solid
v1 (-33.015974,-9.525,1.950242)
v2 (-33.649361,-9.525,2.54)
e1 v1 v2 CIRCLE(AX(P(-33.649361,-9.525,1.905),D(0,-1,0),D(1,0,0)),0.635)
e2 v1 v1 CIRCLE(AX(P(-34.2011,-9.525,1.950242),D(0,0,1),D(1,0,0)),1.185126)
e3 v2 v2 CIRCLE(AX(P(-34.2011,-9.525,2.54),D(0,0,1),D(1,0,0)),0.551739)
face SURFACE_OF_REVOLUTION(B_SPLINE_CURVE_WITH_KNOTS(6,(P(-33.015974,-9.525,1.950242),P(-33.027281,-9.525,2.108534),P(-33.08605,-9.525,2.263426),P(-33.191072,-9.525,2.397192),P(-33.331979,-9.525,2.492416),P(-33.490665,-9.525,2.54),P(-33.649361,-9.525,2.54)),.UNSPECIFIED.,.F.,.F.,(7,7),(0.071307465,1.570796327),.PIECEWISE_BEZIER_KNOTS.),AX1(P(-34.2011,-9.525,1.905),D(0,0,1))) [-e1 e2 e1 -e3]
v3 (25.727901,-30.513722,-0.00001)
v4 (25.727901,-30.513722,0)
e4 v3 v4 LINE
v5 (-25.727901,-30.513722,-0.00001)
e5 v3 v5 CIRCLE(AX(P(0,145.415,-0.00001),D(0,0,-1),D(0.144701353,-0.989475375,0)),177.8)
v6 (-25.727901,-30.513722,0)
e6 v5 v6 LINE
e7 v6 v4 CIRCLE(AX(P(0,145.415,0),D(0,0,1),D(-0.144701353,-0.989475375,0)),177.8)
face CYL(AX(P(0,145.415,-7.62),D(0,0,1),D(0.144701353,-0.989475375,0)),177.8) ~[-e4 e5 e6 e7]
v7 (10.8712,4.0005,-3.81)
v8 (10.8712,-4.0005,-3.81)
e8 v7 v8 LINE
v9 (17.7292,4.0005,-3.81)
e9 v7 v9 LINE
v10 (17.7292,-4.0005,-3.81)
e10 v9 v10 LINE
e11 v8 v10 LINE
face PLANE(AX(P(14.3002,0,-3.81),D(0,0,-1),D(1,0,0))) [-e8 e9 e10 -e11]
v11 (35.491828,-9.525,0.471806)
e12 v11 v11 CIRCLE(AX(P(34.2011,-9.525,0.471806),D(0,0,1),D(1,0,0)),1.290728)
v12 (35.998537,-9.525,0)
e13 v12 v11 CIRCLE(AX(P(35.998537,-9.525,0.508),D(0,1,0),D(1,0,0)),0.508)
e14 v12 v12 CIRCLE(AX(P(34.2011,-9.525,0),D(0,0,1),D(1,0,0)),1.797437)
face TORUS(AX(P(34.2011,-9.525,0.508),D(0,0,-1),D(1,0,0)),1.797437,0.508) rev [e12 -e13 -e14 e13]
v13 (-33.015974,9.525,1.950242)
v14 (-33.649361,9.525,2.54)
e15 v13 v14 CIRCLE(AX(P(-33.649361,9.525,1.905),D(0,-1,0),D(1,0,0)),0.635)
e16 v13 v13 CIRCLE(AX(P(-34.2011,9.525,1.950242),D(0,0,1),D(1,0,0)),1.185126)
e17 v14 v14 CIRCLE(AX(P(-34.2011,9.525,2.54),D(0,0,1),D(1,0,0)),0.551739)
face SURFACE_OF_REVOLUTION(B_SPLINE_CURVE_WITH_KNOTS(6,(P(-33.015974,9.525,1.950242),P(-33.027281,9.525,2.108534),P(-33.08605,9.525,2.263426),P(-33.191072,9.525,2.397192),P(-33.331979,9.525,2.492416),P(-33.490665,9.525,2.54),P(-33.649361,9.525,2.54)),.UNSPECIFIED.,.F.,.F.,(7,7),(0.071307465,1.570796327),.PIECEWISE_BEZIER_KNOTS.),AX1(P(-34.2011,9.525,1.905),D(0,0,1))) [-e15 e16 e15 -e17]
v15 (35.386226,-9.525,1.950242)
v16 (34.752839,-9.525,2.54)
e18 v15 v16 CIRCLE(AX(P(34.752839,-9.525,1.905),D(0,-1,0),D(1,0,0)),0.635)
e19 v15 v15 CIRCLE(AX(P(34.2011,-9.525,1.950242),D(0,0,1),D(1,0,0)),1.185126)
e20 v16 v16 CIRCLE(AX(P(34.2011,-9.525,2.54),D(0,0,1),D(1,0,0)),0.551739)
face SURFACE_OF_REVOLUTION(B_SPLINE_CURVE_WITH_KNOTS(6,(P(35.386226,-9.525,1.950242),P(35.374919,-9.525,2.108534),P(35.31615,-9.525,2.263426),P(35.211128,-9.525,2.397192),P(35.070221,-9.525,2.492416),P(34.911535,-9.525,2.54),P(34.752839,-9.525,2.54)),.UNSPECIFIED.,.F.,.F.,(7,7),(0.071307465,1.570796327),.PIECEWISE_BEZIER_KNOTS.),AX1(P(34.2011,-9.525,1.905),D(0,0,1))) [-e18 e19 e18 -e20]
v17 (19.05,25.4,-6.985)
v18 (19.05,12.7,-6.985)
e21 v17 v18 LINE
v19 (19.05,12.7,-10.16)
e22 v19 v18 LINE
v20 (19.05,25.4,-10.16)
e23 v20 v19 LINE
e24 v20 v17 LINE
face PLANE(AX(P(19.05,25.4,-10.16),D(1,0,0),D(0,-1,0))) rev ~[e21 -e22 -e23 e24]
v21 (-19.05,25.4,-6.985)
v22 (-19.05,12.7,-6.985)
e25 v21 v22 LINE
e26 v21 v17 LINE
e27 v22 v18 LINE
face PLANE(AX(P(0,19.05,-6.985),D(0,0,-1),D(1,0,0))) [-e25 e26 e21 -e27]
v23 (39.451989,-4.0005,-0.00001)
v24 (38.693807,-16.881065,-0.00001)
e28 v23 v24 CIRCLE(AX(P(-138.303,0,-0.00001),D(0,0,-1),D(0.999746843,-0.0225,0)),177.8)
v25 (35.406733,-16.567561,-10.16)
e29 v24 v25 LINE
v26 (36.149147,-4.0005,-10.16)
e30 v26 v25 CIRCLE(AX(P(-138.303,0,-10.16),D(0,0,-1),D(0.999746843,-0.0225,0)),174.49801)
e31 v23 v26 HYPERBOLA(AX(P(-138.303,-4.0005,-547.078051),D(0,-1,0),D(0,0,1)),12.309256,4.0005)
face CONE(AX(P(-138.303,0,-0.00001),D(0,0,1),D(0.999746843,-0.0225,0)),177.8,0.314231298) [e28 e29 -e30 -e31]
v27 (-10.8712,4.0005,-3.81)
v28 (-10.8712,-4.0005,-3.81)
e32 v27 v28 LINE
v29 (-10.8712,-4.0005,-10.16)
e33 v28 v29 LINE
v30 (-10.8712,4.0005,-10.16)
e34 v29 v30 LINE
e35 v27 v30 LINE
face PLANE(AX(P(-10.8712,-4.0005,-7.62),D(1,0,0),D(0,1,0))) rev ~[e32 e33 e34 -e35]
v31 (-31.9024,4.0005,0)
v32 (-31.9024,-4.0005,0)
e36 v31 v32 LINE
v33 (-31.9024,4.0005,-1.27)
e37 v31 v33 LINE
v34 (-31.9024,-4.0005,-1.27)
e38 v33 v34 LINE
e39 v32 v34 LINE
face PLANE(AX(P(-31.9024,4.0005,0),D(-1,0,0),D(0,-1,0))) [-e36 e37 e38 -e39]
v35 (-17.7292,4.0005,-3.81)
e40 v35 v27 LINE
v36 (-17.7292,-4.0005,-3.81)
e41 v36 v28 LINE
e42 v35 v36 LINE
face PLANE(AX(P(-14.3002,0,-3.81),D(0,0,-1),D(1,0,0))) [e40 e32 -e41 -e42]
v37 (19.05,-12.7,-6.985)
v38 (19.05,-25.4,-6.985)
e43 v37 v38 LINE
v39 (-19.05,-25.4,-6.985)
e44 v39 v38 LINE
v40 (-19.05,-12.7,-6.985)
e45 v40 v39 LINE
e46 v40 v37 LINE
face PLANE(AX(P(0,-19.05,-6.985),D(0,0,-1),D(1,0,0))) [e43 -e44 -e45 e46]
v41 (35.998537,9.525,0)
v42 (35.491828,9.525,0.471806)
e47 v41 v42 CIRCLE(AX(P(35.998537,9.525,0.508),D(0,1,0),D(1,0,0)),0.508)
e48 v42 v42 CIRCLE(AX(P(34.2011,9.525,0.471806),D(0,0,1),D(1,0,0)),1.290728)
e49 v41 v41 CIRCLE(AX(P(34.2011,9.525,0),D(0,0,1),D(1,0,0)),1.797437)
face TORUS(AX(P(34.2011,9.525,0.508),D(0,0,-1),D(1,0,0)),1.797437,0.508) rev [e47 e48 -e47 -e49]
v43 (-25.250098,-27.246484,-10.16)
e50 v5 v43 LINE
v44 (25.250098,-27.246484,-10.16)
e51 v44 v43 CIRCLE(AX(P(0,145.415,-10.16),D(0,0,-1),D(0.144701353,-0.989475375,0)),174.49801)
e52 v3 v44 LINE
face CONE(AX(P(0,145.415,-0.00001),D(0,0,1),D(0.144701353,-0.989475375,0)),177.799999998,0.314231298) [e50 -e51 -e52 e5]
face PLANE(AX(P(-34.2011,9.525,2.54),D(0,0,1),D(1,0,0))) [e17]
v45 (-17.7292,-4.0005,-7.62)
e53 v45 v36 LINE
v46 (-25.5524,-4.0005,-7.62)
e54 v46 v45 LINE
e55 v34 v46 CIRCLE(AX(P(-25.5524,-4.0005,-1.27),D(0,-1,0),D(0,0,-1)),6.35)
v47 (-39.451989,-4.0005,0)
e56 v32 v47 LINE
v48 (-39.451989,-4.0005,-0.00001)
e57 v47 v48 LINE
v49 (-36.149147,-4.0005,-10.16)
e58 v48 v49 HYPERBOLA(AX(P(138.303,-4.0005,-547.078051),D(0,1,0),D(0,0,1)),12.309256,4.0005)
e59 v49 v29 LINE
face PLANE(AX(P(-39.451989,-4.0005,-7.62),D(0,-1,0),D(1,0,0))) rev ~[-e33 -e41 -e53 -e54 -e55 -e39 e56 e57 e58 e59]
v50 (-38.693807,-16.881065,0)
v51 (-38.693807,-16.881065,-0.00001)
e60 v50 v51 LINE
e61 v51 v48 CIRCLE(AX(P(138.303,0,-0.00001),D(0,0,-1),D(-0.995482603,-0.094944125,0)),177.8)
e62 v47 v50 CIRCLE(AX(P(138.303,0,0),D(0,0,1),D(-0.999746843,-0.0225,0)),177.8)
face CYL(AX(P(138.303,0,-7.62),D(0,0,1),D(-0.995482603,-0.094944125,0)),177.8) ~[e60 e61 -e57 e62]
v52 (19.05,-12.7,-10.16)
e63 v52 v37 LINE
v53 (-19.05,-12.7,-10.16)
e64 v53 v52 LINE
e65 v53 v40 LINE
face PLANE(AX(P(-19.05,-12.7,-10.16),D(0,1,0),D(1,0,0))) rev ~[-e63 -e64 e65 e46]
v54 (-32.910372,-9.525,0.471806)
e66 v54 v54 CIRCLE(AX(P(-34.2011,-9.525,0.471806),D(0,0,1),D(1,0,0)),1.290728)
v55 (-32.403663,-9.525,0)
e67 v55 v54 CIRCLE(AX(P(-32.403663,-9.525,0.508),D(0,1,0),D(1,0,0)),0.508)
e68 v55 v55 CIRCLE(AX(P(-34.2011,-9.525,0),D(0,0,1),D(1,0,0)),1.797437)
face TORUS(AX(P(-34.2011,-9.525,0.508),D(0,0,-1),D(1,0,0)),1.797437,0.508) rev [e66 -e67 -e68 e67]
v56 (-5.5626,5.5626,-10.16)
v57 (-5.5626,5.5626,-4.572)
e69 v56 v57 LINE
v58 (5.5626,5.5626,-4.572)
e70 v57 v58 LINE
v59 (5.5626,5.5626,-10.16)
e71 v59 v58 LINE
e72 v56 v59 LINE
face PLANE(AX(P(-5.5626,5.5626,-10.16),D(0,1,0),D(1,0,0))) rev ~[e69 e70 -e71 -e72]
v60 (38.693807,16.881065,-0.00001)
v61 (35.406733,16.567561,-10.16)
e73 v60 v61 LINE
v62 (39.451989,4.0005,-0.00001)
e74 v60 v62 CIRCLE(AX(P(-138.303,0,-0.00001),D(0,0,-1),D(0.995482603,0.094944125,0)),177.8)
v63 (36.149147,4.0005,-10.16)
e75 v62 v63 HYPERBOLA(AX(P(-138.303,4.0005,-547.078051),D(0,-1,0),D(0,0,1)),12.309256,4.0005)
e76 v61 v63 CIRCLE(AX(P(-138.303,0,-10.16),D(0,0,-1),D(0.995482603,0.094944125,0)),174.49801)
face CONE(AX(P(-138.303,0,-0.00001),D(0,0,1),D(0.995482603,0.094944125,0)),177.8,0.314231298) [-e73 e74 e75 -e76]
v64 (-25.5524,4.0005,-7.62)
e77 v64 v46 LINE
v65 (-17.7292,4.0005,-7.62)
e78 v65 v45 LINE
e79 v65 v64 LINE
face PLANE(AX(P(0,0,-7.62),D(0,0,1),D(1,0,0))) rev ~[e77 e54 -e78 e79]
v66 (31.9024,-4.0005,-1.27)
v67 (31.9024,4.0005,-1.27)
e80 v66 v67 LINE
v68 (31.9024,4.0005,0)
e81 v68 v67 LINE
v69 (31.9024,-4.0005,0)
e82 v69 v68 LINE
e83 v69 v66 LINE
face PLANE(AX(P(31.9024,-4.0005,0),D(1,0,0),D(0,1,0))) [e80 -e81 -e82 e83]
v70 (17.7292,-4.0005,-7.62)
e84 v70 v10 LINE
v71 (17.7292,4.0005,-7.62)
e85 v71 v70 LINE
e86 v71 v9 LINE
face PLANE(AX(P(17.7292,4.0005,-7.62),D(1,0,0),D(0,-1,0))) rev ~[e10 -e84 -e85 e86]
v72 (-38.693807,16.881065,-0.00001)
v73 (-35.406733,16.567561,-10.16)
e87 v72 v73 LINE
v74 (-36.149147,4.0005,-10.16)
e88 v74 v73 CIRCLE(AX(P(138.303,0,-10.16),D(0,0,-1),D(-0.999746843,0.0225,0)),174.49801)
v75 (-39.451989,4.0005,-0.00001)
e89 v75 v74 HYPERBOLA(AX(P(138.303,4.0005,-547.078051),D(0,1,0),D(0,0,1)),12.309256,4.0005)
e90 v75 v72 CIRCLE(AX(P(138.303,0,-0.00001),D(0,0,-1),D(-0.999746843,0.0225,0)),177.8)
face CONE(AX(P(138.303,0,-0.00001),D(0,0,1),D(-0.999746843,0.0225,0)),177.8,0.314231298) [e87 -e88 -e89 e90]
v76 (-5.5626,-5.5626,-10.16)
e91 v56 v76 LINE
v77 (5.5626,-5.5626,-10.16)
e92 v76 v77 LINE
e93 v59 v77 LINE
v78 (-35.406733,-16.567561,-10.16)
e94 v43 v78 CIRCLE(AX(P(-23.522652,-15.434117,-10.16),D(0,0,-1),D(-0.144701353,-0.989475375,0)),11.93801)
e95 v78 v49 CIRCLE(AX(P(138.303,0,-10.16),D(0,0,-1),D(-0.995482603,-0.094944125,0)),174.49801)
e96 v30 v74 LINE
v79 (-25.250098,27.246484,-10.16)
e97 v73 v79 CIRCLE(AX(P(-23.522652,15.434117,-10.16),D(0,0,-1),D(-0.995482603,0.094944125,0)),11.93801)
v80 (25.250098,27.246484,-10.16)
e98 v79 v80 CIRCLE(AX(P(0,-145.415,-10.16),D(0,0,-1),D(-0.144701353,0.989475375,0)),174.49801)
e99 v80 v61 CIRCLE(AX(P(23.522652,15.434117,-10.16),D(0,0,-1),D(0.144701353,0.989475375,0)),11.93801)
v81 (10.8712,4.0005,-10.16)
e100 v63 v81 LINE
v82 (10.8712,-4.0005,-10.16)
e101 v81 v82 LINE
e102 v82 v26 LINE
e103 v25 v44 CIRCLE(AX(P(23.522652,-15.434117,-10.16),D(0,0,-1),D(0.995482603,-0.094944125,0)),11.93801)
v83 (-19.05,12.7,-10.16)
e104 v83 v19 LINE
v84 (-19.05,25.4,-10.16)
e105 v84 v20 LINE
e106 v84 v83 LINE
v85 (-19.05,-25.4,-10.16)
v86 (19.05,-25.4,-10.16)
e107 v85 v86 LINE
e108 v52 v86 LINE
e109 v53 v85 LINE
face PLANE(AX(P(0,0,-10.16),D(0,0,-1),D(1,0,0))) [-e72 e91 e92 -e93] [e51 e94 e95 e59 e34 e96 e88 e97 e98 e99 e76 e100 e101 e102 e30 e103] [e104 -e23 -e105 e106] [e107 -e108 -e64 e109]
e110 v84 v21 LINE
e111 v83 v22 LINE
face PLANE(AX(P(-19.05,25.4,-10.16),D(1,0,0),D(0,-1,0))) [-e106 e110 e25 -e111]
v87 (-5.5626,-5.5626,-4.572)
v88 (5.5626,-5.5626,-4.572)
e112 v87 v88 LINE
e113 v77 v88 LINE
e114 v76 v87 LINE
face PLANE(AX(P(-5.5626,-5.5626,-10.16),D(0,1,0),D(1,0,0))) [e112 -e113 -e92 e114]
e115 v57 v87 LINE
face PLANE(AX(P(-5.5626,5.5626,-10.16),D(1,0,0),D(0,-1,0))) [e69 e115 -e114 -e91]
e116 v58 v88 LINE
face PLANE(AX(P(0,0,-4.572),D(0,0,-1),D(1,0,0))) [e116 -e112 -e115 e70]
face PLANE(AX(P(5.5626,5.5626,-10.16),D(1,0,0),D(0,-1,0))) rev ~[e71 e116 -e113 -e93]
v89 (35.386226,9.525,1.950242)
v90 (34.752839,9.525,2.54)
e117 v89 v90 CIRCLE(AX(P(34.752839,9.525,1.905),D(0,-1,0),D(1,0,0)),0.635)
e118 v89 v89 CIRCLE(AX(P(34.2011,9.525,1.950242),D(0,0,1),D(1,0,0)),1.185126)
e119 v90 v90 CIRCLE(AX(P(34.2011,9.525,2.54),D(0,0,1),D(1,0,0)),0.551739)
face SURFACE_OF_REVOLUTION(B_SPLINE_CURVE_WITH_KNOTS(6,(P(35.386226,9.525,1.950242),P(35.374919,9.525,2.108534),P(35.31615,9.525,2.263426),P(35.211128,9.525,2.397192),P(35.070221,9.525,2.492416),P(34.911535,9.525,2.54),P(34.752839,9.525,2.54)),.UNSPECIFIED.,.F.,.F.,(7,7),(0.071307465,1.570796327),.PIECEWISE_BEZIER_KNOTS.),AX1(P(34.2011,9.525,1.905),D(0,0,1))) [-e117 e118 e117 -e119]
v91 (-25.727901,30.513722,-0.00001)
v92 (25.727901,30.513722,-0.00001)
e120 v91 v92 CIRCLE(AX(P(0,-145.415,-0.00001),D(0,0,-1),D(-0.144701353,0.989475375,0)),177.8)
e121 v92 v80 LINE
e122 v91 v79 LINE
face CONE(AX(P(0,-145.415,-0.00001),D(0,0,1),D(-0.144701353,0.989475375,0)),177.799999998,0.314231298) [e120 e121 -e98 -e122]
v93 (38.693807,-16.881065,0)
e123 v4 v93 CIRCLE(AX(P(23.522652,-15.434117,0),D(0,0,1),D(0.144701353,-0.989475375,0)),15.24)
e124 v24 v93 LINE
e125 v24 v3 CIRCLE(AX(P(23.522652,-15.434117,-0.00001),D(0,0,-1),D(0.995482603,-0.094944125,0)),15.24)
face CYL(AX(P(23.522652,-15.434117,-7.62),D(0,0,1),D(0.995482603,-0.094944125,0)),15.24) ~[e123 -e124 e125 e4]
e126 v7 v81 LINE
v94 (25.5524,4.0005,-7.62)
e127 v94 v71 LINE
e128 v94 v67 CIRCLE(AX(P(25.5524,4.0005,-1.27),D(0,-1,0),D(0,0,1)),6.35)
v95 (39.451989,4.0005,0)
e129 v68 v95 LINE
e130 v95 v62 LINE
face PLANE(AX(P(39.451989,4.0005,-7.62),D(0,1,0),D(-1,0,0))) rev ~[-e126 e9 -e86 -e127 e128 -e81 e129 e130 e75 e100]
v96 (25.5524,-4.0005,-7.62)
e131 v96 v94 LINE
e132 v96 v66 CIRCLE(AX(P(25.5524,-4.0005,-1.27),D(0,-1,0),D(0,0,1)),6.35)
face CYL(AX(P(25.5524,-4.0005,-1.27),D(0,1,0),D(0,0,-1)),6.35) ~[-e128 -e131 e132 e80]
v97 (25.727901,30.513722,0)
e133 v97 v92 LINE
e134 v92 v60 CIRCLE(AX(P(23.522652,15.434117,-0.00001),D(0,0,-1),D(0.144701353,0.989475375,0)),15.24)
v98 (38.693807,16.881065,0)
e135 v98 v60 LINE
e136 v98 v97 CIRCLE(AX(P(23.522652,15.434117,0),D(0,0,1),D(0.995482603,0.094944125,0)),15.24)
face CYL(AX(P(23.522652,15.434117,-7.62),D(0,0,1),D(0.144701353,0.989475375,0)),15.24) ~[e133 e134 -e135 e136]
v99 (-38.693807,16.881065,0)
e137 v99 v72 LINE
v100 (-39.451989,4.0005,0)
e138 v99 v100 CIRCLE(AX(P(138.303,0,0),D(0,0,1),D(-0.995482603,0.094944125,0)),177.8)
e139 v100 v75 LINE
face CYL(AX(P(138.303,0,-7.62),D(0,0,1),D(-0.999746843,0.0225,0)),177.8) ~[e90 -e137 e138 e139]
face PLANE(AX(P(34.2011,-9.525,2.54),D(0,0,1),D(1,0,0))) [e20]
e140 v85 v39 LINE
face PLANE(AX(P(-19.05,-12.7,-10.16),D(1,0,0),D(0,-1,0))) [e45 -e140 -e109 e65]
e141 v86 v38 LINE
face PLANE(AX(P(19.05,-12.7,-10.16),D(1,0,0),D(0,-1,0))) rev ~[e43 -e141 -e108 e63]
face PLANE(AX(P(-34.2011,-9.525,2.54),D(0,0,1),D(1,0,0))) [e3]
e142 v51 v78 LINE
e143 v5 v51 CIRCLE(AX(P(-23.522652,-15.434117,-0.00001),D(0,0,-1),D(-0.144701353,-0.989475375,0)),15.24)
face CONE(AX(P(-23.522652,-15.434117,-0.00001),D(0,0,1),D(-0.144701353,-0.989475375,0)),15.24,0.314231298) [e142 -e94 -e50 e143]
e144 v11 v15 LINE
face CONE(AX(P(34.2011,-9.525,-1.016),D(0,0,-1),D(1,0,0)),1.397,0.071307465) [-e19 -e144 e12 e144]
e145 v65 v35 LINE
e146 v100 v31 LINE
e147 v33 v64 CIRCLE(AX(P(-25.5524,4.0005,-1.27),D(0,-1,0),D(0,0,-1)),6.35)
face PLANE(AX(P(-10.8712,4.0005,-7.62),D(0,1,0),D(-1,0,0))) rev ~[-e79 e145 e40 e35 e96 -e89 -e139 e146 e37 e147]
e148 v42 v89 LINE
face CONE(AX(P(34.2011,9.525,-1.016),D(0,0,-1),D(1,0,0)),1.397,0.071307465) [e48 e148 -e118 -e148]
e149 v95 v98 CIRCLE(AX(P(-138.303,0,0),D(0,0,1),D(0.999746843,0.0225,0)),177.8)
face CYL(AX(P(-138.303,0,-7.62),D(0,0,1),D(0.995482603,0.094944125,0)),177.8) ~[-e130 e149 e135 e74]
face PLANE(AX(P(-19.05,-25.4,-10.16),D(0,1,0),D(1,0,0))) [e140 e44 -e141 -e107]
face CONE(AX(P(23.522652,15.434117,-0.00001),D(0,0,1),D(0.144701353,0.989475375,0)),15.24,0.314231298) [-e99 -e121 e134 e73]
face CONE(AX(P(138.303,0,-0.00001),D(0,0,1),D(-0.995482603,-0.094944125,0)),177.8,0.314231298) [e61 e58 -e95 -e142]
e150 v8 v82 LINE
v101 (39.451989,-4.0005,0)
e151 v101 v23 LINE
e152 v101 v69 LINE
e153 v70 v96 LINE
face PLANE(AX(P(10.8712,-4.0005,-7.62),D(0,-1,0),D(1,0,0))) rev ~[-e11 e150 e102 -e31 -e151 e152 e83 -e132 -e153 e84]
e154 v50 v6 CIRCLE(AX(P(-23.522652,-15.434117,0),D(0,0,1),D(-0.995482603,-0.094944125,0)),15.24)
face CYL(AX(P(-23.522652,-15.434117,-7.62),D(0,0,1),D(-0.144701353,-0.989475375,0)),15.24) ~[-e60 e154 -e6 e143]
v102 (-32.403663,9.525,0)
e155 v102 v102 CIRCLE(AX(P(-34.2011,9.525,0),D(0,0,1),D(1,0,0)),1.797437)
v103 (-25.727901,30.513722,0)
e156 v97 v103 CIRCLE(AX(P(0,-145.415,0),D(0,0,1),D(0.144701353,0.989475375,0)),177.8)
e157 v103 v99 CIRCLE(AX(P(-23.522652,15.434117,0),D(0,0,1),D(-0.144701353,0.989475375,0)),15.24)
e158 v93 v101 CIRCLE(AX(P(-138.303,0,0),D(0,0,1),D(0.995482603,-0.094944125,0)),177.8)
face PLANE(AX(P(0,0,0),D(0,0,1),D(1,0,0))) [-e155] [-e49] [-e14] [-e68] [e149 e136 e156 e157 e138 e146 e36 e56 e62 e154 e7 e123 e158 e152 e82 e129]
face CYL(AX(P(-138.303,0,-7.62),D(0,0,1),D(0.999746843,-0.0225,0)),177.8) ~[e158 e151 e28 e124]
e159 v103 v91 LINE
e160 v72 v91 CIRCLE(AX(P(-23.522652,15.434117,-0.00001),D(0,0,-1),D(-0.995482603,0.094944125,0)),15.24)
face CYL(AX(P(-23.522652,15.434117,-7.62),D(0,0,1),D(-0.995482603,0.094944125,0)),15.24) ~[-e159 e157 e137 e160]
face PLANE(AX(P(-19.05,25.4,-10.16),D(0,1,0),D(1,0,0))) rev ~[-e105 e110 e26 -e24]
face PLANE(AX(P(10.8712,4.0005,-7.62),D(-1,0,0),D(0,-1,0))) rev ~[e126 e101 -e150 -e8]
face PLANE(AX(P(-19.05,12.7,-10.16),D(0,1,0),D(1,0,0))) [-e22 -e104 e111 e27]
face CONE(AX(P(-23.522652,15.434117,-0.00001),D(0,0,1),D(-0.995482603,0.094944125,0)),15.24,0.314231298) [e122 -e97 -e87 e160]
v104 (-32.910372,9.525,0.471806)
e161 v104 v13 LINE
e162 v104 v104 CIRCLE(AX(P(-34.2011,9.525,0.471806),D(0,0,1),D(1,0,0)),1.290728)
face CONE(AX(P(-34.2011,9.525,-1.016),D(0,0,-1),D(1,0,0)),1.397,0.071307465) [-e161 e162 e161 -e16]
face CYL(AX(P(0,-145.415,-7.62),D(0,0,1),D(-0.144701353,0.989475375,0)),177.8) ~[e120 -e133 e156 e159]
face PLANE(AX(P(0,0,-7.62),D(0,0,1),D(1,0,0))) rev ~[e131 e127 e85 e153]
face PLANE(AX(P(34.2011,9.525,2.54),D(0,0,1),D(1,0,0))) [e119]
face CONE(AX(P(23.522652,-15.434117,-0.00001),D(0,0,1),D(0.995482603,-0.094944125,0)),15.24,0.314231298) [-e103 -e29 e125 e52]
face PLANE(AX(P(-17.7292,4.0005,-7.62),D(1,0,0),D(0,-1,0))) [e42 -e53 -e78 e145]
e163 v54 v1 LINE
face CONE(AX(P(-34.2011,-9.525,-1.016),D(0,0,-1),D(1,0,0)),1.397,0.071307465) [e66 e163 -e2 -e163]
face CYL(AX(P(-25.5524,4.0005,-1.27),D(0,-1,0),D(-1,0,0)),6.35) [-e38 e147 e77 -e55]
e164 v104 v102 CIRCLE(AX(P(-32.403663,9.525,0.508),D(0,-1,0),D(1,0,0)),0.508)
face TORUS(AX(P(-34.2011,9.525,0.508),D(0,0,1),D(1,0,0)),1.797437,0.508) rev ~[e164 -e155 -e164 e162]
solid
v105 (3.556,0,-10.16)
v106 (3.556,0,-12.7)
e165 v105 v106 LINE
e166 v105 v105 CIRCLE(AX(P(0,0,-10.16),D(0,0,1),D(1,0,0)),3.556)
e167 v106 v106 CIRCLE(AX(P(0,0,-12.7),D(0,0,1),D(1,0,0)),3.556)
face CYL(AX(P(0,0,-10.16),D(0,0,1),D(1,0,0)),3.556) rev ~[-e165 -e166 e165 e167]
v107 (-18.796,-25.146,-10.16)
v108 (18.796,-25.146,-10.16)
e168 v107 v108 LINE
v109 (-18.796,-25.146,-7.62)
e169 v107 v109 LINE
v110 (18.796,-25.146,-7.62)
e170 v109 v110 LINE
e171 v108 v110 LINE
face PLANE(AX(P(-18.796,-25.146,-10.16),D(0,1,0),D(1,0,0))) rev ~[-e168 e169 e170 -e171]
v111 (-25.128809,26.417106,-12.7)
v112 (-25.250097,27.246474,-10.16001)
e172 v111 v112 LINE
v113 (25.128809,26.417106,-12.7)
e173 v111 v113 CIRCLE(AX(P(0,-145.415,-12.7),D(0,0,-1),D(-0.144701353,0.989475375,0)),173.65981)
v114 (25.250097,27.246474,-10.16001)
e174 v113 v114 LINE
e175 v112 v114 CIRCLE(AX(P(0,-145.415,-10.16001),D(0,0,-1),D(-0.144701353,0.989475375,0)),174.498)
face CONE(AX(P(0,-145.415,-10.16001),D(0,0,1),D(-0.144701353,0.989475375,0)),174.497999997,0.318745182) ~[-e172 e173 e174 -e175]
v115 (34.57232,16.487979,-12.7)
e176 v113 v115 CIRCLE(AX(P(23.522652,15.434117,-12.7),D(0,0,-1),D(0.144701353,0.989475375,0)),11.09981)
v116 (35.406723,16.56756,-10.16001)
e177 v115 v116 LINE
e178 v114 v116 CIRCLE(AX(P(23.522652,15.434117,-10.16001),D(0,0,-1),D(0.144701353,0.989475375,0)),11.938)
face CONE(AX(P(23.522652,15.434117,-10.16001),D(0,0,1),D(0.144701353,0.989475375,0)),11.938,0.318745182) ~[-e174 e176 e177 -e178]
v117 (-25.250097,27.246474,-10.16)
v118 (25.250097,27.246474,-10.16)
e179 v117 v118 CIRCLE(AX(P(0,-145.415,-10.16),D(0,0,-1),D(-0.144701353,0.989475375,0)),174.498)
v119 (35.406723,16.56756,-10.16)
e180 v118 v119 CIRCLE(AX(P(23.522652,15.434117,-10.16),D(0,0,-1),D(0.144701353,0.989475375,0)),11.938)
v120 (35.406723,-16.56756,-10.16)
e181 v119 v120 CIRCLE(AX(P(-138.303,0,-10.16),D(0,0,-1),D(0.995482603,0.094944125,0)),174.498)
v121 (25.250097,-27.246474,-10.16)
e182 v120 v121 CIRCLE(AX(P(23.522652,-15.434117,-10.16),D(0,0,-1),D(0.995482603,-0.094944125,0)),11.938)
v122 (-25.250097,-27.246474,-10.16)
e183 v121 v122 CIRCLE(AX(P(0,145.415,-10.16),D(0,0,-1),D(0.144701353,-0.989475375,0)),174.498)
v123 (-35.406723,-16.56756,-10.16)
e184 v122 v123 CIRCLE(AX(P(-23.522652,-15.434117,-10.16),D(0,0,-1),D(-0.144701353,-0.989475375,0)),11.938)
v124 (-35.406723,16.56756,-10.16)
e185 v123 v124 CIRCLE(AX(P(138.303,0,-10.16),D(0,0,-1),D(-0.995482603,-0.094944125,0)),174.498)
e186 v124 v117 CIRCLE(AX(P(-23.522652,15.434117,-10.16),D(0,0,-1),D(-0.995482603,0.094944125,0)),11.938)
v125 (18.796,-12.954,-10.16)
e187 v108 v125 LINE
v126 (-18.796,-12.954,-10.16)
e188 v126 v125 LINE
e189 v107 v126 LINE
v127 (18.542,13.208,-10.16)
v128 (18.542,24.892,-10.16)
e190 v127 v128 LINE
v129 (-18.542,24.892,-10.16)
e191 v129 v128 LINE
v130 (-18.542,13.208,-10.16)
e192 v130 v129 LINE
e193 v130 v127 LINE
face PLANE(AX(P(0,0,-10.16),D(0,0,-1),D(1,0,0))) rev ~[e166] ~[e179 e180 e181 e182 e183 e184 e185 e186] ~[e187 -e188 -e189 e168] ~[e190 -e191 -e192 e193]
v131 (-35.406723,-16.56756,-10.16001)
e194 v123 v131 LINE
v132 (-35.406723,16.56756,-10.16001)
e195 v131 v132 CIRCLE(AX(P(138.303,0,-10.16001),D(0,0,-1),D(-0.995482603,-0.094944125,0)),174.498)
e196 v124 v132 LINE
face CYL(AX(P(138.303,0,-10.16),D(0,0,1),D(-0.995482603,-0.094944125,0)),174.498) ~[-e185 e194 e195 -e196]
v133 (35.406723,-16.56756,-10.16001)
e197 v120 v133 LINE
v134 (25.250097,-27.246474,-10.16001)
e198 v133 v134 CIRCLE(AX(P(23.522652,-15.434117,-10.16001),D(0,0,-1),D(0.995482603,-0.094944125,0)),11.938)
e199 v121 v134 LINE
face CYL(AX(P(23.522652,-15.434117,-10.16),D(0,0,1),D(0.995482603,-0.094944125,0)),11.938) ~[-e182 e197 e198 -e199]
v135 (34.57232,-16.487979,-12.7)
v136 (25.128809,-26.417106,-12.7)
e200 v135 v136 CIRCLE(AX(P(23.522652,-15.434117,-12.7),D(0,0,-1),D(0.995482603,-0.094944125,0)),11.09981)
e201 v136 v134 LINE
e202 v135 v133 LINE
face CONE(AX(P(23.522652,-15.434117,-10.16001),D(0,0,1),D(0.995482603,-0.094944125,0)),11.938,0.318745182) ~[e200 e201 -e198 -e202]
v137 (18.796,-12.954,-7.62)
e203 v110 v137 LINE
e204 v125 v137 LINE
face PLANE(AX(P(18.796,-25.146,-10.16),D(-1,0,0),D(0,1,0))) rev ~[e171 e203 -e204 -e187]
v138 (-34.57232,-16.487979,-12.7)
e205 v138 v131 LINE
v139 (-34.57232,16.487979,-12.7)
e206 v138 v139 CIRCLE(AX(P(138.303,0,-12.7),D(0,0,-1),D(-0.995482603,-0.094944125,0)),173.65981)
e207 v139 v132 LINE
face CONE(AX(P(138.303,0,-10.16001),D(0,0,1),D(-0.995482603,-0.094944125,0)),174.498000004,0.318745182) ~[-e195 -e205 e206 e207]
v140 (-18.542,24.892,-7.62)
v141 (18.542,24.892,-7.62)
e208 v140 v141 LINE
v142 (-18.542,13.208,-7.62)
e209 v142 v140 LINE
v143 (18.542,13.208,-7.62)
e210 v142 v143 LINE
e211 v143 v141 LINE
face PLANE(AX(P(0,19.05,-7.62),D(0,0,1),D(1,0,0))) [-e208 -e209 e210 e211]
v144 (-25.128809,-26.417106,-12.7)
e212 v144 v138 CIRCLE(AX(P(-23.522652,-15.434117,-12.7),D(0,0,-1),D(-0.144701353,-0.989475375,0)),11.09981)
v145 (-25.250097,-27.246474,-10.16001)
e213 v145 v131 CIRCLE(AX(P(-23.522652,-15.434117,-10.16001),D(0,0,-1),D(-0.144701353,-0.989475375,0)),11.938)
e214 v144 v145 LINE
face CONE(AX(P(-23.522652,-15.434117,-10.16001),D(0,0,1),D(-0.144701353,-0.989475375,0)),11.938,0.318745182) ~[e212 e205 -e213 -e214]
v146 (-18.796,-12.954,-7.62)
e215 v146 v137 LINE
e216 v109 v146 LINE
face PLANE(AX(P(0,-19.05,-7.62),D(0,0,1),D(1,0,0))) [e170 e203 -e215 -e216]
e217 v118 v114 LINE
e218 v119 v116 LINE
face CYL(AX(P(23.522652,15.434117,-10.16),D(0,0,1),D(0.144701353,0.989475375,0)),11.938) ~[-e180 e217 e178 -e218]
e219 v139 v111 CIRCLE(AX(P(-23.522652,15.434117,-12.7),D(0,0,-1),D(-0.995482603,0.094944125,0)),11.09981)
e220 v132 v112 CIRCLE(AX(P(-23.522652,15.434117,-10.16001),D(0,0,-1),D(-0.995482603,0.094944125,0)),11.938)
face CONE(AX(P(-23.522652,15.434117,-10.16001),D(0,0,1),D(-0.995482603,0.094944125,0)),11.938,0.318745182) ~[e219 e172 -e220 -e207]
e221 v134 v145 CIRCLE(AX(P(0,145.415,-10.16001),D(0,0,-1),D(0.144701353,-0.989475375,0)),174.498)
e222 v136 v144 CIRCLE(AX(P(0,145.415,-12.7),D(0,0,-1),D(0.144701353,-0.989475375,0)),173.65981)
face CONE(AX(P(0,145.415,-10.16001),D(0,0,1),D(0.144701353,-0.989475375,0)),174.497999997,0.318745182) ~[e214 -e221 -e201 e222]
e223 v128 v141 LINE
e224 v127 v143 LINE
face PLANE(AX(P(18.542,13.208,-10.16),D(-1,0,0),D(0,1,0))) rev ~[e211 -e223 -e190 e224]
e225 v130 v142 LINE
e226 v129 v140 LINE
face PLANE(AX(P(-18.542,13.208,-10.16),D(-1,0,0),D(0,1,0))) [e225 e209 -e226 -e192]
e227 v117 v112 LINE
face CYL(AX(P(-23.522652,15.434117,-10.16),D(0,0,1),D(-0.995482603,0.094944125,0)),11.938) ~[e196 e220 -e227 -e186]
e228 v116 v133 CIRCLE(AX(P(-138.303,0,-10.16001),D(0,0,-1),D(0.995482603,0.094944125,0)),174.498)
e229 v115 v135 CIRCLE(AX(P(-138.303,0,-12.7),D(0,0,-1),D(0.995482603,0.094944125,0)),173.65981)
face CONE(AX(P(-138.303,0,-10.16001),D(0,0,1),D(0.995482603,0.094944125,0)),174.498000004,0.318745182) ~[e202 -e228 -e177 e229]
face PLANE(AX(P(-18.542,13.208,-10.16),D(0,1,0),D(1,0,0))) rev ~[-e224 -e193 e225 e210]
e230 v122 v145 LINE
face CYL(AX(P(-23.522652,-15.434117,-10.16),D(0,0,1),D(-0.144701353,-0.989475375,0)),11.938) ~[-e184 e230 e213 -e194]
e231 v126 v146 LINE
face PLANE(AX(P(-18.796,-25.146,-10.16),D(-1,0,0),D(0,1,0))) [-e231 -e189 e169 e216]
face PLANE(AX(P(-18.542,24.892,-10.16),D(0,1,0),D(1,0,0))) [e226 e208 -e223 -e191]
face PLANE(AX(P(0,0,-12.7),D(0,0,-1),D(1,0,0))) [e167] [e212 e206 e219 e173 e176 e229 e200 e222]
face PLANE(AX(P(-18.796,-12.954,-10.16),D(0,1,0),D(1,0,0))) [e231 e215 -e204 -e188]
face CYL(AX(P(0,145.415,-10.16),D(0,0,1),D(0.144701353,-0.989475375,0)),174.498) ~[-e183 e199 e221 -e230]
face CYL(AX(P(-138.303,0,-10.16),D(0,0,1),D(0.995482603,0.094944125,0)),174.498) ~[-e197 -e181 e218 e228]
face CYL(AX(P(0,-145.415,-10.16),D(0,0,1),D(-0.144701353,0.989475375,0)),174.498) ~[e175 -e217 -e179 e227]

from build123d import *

# Parameters (mm, degrees)
F1_DEPTH    = 7.62
F2_R        = 1.397
F3_DEPTH    = 2.54
F5_R        = 0.635
F6_R        = 0.508
F8_DEPTH    = 2.54
F9_W        = 6.858
F9_H        = 8.001
F10_DEPTH   = 3.81
F11_R       = 6.35
F12_SIZE2   = 3.30199
F12_SIZE    = 10.15999
F12_2_SIZE2 = 3.30199
F12_2_SIZE  = 10.15999
F14_DEPTH   = 2.54
F15_SIZE2   = 2.53999
F15_SIZE    = 0.83819
F16_W       = 38.1
F16_H       = 12.7
F17_DEPTH   = 3.175
F18_W       = 37.084
F18_H       = 11.684
F18_W_2     = 37.592
F18_H_2     = 12.192
F19_DEPTH   = 2.54
F20_W       = 11.1252
F20_H       = 11.1252
F21_DEPTH   = 5.588
F22_R       = 3.556
F23_DEPTH   = 2.541


# Not quite as in the source:
# - a fillet or chamfer that OpenCascade refuses, or shapes differently, is made with other operations: its cross-section is extruded or revolved along the edge and cut away or added
# - a fillet or chamfer is up to 0.001 mm smaller than in the source, because OpenCascade refuses the exact size


with BuildPart() as f1:
    # F0 (on Top) → F1 (new body)
    with BuildSketch(Plane.XY):
        with BuildLine():
            Line((-31.9024, -4.0005), (-39.4519886775, -4.0005))
            ThreePointArc((-39.4519886775, -4.0005), (-39.1897782919, -10.4476626198), (-38.6938068301, -16.8810654862))
            ThreePointArc((-38.6938068301, -16.8810654862), (-34.5656216089, -25.9369938271), (-25.7279005801, -30.5137217362))
            ThreePointArc((-25.7279005801, -30.5137217362), (0, -32.385), (25.7279005801, -30.5137217362))
            ThreePointArc((25.7279005801, -30.5137217362), (34.5656216089, -25.9369938271), (38.6938068301, -16.8810654862))
            ThreePointArc((38.6938068301, -16.8810654862), (39.1897782919, -10.4476626198), (39.4519886775, -4.0005))
            Line((39.4519886775, -4.0005), (31.9024, -4.0005))
            Line((31.9024, -4.0005), (31.9024, 4.0005))
            Line((31.9024, 4.0005), (39.4519886775, 4.0005))
            ThreePointArc((39.4519886775, 4.0005), (39.1897782919, 10.4476626198), (38.6938068301, 16.8810654862))
            ThreePointArc((38.6938068301, 16.8810654862), (34.5656216089, 25.9369938271), (25.7279005801, 30.5137217362))
            ThreePointArc((25.7279005801, 30.5137217362), (0, 32.385), (-25.7279005801, 30.5137217362))
            ThreePointArc((-25.7279005801, 30.5137217362), (-34.5656216089, 25.9369938271), (-38.6938068301, 16.8810654862))
            ThreePointArc((-38.6938068301, 16.8810654862), (-39.1897782919, 10.4476626198), (-39.4519886775, 4.0005))
            Line((-39.4519886775, 4.0005), (-31.9024, 4.0005))
            Line((-31.9024, 4.0005), (-31.9024, -4.0005))
        make_face()
    extrude(amount=-F1_DEPTH)

    # F2 (on Top) → F3 (join)
    with BuildSketch(Plane.XY):
        with Locations((-34.2011, 9.525)):
            Circle(F2_R)
        with Locations((-34.2011, -9.525)):
            Circle(F2_R)
        with Locations((34.2011, 9.525)):
            Circle(F2_R)
        with Locations((34.2011, -9.525)):
            Circle(F2_R)
    extrude(amount=F3_DEPTH)

    # F4: chamfer of 0.254 x 3.556 on 4 edges, made by hand


with BuildPart() as f4_tool2:
    # F4_s3 → F4_t4 (revolve)
    with BuildSketch(Plane.XZ.offset(-9.525)):
        Polygon((-32.8041, -1.016), (-33.0581, 2.54), (-32.8041, 2.54), align=None)
    revolve(axis=Axis((-34.2011, 9.525, 2.54), (0, 0, 1)))

    split(bisect_by=Plane.XY, keep=Keep.TOP)


with BuildPart() as f1_1:
    add(f1.part)

    # F4_t1: cut F4_tool2
    add(f4_tool2.part, mode=Mode.SUBTRACT)


with BuildPart() as f4_tool7:
    # F4_s8 → F4_t9 (revolve)
    with BuildSketch(Plane.XZ.offset(9.525)):
        Polygon((-32.8041, -1.016), (-33.0581, 2.54), (-32.8041, 2.54), align=None)
    revolve(axis=Axis((-34.2011, -9.525, 2.54), (0, 0, 1)))

    split(bisect_by=Plane.XY, keep=Keep.TOP)


with BuildPart() as f1_2:
    add(f1_1.part)

    # F4_t6: cut F4_tool7
    add(f4_tool7.part, mode=Mode.SUBTRACT)


with BuildPart() as f4_tool12:
    # F4_s13 → F4_t14 (revolve)
    with BuildSketch(Plane.XZ.offset(-9.525)):
        Polygon((35.5981, -1.016), (35.3441, 2.54), (35.5981, 2.54), align=None)
    revolve(axis=Axis((34.2011, 9.525, 2.54), (0, 0, 1)))

    split(bisect_by=Plane.XY, keep=Keep.TOP)


with BuildPart() as f1_3:
    add(f1_2.part)

    # F4_t11: cut F4_tool12
    add(f4_tool12.part, mode=Mode.SUBTRACT)


with BuildPart() as f4_tool17:
    # F4_s18 → F4_t19 (revolve)
    with BuildSketch(Plane.XZ.offset(9.525)):
        Polygon((35.5981, -1.016), (35.3441, 2.54), (35.5981, 2.54), align=None)
    revolve(axis=Axis((34.2011, -9.525, 2.54), (0, 0, 1)))

    split(bisect_by=Plane.XY, keep=Keep.TOP)


with BuildPart() as f1_4:
    add(f1_3.part)

    # F4_t16: cut F4_tool17
    add(f4_tool17.part, mode=Mode.SUBTRACT)

    # F5
    f5_edges = [f1_4.edges().sort_by_distance(p)[0] for p in [
        (-35.3441, 9.525, 2.54),
        (-35.3441, -9.525, 2.54),
        (33.0581, 9.525, 2.54),
        (33.0581, -9.525, 2.54),
    ]]
    fillet(f5_edges, radius=F5_R)

    # F6
    f6_edges = [f1_4.edges().sort_by_distance(p)[0] for p in [
        (-35.525529, 9.525, 0),
        (-35.525529, -9.525, 0),
        (32.876671, 9.525, 0),
        (32.876671, -9.525, 0),
    ]]
    fillet(f6_edges, radius=F6_R)

    # F7 (on face) → F8 (join)
    with BuildSketch(Plane(origin=(0, 0, -7.62), x_dir=(1, 0, 0), z_dir=(0, 0, -1))):
        with BuildLine():
            ThreePointArc((-25.7279005801, 30.5137217362), (-34.5656216089, 25.9369938271), (-38.6938068301, 16.8810654862))
            ThreePointArc((-38.6938068301, 16.8810654862), (-39.1897782919, 10.4476626198), (-39.4519886775, 4.0005))
            Line((-39.4519886775, 4.0005), (-10.8712, 4.0005))
            Line((-10.8712, 4.0005), (-10.8712, -4.0005))
            Line((-10.8712, -4.0005), (-39.4519886775, -4.0005))
            ThreePointArc((-39.4519886775, -4.0005), (-39.1897782919, -10.4476626198), (-38.6938068301, -16.8810654862))
            ThreePointArc((-38.6938068301, -16.8810654862), (-34.5656216089, -25.9369938271), (-25.7279005801, -30.5137217362))
            ThreePointArc((-25.7279005801, -30.5137217362), (0, -32.385), (25.7279005801, -30.5137217362))
            ThreePointArc((25.7279005801, -30.5137217362), (34.5656216089, -25.9369938271), (38.6938068301, -16.8810654862))
            ThreePointArc((38.6938068301, -16.8810654862), (39.1897782919, -10.4476626198), (39.4519886775, -4.0005))
            Line((39.4519886775, -4.0005), (10.8712, -4.0005))
            Line((10.8712, -4.0005), (10.8712, 4.0005))
            Line((10.8712, 4.0005), (39.4519886775, 4.0005))
            ThreePointArc((39.4519886775, 4.0005), (39.1897782919, 10.4476626198), (38.6938068301, 16.8810654862))
            ThreePointArc((38.6938068301, 16.8810654862), (34.5656216089, 25.9369938271), (25.7279005801, 30.5137217362))
            ThreePointArc((25.7279005801, 30.5137217362), (0, 32.385), (-25.7279005801, 30.5137217362))
        make_face()
    extrude(amount=F8_DEPTH)

    # F9 (on face) → F10 (cut)
    with BuildSketch(Plane(origin=(0, 0, -7.62), x_dir=(1, 0, 0), z_dir=(0, 0, -1))):
        with Locations((-14.3002, 0)):
            Rectangle(F9_W, F9_H)
        with Locations((14.3002, 0)):
            Rectangle(F9_W, F9_H)
    extrude(amount=-F10_DEPTH, mode=Mode.SUBTRACT)

    # F11
    f11_edges = [f1_4.edges().sort_by_distance(p)[0] for p in [
        (-31.9024, 0, -7.62),
        (31.9024, 0, -7.62),
    ]]
    fillet(f11_edges, radius=F11_R)

    # F12 (size 10.16 and 3.302 in the source; OpenCascade refuses exactly that, so slightly less here)
    f12_edges = [f1_4.edges().sort_by_distance(p)[0] for p in [
        (-34.565622, 25.936994, -10.16),
    ]]
    f12_side = f1_4.faces().sort_by_distance((-34.565622, 25.936994, -5.08))[0]
    chamfer(f12_edges, length=F12_SIZE, length2=F12_SIZE2, reference=f12_side)

    # F12#2 (size 10.16 and 3.302 in the source; OpenCascade refuses exactly that, so slightly less here)
    f12_2_edges = [f1_4.edges().sort_by_distance(p)[0] for p in [
        (-34.565622, -25.936994, -10.16),
    ]]
    f12_2_side = f1_4.faces().sort_by_distance((-34.565622, -25.936994, -5.08))[0]
    chamfer(f12_2_edges, length=F12_2_SIZE, length2=F12_2_SIZE2, reference=f12_2_side)

    # F16 (on face) → F17 (cut)
    with BuildSketch(Plane(origin=(0, 0, -10.16), x_dir=(1, 0, 0), z_dir=(0, 0, -1))):
        with Locations((0, 19.05)):
            Rectangle(F16_W, F16_H)
        with Locations((0, -19.05)):
            Rectangle(F16_W, F16_H)
    extrude(amount=-F17_DEPTH, mode=Mode.SUBTRACT)

    # F20 (on face) → F21 (cut)
    with BuildSketch(Plane(origin=(0, 0, -10.16), x_dir=(1, 0, 0), z_dir=(0, 0, -1))):
        Rectangle(F20_W, F20_H)
    extrude(amount=-F21_DEPTH, mode=Mode.SUBTRACT)


with BuildPart() as f14:
    # F13 (on face) → F14 (new body)
    with BuildSketch(Plane(origin=(0, 0, -10.16), x_dir=(1, 0, 0), z_dir=(0, 0, -1))):
        with BuildLine():
            ThreePointArc((35.4067232747, -16.5675599843), (36.195, 0), (35.4067232747, 16.5675599843))
            ThreePointArc((35.4067232747, 16.5675599843), (32.1729781847, 23.6613705181), (25.2500967122, 27.2464740468))
            ThreePointArc((25.2500967122, 27.2464740468), (0, 29.083), (-25.2500967122, 27.2464740468))
            ThreePointArc((-25.2500967122, 27.2464740468), (-32.1729781847, 23.6613705181), (-35.4067232747, 16.5675599843))
            ThreePointArc((-35.4067232747, 16.5675599843), (-36.195, 0), (-35.4067232747, -16.5675599843))
            ThreePointArc((-35.4067232747, -16.5675599843), (-32.1729781847, -23.6613705181), (-25.2500967122, -27.2464740468))
            ThreePointArc((-25.2500967122, -27.2464740468), (0, -29.083), (25.2500967122, -27.2464740468))
            ThreePointArc((25.2500967122, -27.2464740468), (32.1729781847, -23.6613705181), (35.4067232747, -16.5675599843))
        make_face()
    extrude(amount=F14_DEPTH)

    # F15 (size 0.8382 and 2.54 in the source; OpenCascade refuses exactly that, so slightly less here)
    f15_edges = [f14.edges().sort_by_distance(p)[0] for p in [
        (0, -29.083, -12.7),
    ]]
    f15_side = f14.faces().sort_by_distance((0, 0, -12.7))[0]
    chamfer(f15_edges, length=F15_SIZE, length2=F15_SIZE2, reference=f15_side)

    # F18 (on face) → F19 (join)
    with BuildSketch(Plane.XY.offset(-10.16)):
        with Locations((0, 19.05)):
            Rectangle(F18_W, F18_H)
        with Locations((0, -19.05)):
            Rectangle(F18_W_2, F18_H_2)
    extrude(amount=F19_DEPTH)

    # F22 (on face) → F23 (cut, through all)
    with BuildSketch(Plane.XY.offset(-10.16)):
        Circle(F22_R)
    extrude(amount=-F23_DEPTH, mode=Mode.SUBTRACT)


solid = Compound([f1_4.part, f14.part])
